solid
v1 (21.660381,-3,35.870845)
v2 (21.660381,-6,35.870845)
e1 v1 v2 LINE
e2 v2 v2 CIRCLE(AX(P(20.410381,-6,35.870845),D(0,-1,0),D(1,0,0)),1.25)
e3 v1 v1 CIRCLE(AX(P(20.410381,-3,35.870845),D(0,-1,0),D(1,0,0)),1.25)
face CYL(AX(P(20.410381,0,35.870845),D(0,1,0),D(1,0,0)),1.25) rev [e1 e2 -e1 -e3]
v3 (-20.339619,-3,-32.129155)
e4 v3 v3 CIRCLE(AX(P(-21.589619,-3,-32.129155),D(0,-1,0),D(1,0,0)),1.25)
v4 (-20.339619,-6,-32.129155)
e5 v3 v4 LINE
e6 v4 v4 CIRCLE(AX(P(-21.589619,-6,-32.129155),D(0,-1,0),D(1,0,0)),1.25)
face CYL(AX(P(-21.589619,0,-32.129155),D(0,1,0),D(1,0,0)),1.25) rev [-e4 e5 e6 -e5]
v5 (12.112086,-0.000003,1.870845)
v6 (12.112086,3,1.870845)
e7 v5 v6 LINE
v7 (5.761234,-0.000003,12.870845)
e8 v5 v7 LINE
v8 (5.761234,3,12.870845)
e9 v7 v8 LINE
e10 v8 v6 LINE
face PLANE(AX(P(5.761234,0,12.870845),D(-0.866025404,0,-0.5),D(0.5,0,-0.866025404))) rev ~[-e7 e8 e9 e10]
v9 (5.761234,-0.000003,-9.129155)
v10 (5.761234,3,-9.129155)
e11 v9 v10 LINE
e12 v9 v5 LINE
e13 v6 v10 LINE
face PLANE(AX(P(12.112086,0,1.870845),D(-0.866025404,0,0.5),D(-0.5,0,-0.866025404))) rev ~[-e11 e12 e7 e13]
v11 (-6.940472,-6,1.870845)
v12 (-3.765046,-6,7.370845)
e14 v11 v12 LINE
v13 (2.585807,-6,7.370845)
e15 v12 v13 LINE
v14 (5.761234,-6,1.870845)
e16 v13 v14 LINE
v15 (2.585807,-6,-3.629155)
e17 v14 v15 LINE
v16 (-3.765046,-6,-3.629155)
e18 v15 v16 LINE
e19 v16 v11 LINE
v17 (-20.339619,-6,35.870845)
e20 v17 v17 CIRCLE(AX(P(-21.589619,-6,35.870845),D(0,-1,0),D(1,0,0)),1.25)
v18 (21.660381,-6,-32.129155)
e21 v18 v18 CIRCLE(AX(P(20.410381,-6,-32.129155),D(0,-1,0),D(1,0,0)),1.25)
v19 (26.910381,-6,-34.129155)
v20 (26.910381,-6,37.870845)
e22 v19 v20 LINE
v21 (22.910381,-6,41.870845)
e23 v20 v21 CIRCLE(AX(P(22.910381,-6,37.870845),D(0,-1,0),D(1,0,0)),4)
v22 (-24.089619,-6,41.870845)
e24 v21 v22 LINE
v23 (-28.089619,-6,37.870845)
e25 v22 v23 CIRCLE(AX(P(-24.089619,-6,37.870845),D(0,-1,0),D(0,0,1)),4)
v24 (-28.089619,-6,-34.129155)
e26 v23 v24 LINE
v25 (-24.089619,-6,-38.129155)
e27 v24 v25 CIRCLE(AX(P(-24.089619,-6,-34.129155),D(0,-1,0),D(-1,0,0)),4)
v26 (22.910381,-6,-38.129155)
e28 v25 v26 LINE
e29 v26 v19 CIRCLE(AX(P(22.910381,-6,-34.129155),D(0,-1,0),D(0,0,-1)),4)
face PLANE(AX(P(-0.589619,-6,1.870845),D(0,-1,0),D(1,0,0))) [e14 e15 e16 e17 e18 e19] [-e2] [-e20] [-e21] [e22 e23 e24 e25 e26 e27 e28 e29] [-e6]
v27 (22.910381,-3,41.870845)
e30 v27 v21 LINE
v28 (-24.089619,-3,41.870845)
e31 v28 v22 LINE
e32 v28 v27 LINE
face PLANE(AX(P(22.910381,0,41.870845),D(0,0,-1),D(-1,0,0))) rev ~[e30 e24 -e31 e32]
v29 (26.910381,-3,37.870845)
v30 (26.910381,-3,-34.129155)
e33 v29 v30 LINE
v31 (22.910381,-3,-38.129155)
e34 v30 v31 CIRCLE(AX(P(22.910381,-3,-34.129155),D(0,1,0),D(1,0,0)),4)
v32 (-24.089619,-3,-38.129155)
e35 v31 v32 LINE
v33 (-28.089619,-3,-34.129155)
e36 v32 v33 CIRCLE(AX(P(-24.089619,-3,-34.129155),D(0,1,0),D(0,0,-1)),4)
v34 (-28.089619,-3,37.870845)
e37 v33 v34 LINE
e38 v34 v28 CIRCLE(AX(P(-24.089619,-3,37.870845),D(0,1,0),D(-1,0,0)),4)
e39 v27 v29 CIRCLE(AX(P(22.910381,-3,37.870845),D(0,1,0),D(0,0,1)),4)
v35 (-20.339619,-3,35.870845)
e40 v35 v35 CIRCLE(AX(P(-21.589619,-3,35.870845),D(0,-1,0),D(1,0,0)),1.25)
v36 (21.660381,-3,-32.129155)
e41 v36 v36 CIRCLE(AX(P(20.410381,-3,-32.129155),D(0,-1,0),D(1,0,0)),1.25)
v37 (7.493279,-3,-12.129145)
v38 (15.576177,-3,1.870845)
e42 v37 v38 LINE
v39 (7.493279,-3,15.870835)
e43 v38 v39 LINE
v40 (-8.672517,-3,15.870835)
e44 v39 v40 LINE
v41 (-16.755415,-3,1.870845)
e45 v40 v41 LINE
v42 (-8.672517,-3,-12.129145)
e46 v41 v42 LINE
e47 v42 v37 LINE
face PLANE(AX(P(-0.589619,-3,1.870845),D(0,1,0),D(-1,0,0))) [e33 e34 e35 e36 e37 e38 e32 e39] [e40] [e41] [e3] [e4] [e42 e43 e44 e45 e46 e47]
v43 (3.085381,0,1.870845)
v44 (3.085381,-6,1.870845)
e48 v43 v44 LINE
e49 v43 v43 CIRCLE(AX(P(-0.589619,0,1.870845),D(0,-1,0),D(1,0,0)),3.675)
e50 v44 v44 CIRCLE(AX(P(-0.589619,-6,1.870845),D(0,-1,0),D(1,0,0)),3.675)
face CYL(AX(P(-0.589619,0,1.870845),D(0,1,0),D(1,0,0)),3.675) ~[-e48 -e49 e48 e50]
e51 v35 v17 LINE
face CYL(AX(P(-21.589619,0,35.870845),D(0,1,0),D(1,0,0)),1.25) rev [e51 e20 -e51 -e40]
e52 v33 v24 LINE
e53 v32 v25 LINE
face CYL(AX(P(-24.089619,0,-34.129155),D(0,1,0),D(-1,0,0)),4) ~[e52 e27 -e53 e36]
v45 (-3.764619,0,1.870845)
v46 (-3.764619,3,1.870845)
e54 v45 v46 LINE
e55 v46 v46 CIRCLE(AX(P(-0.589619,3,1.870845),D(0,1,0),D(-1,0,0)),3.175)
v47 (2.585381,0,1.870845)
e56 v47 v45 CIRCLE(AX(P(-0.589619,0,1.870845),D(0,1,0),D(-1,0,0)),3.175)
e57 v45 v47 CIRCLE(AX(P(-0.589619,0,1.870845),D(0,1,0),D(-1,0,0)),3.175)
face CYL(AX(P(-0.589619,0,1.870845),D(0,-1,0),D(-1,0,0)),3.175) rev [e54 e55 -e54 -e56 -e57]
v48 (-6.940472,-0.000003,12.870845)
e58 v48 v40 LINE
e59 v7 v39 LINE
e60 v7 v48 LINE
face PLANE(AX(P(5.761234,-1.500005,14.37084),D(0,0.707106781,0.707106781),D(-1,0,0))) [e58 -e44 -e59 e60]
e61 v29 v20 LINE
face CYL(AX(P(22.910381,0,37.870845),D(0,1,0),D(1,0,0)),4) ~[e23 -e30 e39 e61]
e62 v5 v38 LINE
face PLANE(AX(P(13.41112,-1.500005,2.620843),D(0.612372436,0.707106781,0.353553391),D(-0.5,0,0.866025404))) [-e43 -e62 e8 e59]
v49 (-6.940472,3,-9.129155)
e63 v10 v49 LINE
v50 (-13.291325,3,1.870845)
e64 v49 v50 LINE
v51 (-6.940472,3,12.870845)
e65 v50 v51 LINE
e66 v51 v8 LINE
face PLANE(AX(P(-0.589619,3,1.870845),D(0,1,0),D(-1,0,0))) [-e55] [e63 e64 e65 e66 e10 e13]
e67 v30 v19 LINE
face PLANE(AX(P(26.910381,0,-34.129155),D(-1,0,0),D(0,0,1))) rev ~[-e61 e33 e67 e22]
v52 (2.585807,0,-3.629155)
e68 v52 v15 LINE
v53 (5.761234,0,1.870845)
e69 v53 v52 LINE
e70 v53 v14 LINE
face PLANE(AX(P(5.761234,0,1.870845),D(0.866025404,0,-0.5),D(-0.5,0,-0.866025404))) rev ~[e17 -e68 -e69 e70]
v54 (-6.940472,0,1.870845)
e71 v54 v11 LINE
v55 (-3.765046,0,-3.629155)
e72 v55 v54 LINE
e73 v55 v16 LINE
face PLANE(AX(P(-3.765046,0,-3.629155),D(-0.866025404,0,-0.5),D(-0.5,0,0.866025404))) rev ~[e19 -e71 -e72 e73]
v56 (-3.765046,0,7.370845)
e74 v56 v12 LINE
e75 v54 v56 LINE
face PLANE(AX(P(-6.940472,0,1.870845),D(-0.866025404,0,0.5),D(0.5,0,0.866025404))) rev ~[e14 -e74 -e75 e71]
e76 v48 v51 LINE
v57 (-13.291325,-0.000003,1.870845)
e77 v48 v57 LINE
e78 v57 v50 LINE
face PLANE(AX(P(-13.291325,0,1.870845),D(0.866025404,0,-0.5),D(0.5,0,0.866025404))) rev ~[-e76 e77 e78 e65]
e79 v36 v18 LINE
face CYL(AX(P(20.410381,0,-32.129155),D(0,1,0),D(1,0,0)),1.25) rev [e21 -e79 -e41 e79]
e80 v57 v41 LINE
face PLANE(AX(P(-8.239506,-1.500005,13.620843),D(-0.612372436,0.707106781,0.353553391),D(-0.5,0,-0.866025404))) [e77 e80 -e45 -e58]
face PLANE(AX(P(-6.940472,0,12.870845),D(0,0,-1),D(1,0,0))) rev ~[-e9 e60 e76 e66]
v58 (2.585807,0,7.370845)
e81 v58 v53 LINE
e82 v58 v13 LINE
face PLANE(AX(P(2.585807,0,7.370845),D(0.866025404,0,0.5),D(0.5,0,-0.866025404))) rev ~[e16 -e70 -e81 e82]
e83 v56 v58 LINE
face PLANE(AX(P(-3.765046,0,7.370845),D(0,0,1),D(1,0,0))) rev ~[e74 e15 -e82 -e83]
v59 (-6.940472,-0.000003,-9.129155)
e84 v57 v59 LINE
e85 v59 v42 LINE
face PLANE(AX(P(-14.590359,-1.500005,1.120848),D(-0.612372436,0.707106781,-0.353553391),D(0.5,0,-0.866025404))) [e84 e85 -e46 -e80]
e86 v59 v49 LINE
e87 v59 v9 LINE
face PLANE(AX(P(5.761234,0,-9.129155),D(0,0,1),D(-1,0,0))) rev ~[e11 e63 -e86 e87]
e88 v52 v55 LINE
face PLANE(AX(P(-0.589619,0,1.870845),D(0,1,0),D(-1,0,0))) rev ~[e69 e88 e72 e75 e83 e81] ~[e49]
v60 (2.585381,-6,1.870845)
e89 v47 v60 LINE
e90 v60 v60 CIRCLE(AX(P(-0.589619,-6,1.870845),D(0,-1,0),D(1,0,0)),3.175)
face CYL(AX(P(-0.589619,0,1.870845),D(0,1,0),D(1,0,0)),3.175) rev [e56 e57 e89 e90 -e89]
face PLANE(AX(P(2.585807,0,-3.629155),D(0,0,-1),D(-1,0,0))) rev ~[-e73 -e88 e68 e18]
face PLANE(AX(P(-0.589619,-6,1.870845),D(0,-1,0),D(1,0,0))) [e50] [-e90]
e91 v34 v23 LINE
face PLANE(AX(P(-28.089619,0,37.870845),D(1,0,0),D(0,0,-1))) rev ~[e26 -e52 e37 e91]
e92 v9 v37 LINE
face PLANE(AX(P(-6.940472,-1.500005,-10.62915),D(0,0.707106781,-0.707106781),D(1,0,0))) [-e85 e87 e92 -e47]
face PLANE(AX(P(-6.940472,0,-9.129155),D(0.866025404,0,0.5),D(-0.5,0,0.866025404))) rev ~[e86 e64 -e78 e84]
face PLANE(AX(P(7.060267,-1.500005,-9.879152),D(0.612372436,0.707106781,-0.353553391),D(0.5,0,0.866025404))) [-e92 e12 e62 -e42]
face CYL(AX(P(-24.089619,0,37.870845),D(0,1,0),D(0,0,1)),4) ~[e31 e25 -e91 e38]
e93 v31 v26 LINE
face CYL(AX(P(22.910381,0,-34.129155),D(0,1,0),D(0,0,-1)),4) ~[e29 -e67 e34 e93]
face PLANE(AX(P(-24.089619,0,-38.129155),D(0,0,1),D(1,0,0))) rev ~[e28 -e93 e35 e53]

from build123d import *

# Parameters (mm, degrees)
F0_R     = 1.25
F1_DEPTH = 6
F2_R     = 1.25
F3_DEPTH = 3
F4_SIZE  = 2.99999
F5_R     = 3.175
F6_DEPTH = 3
F7_R     = 3.675
F7_R_2   = 3.175
F8_DEPTH = 6


# Not quite as in the source:
# - a fillet or chamfer is up to 0.001 mm smaller than in the source, because OpenCascade refuses the exact size


with BuildPart() as f1:
    # F0 (on Front) → F1 (new body)
    with BuildSketch(Plane.XZ):
        with BuildLine():
            Line((22.9103805721, 41.8708454072), (-24.0896194279, 41.8708454072))
            ThreePointArc((-24.0896194279, 41.8708454072), (-26.9180465527, 40.699272532), (-28.0896194279, 37.8708454072))
            Line((-28.0896194279, 37.8708454072), (-28.0896194279, -34.1291545928))
            ThreePointArc((-28.0896194279, -34.1291545928), (-26.9180465527, -36.9575817175), (-24.0896194279, -38.1291545928))
            Line((-24.0896194279, -38.1291545928), (22.9103805721, -38.1291545928))
            ThreePointArc((22.9103805721, -38.1291545928), (25.7388076968, -36.9575817175), (26.9103805721, -34.1291545928))
            Line((26.9103805721, -34.1291545928), (26.9103805721, 37.8708454072))
            ThreePointArc((26.9103805721, 37.8708454072), (25.7388076968, 40.699272532), (22.9103805721, 41.8708454072))
        make_face()
        with Locations((-21.5896194279, -32.1291545928)):
            Circle(F0_R, mode=Mode.SUBTRACT)
        with Locations((20.4103805721, -32.1291545928)):
            Circle(F0_R, mode=Mode.SUBTRACT)
        Polygon((5.7612335332, 1.8708454072), (2.5858070526, -3.6291545928), (-3.7650459085, -3.6291545928), (-6.940472389, 1.8708454072), (-3.7650459085, 7.3708454072), (2.5858070526, 7.3708454072), align=None, mode=Mode.SUBTRACT)
        with Locations((-21.5896194279, 35.8708454072)):
            Circle(F0_R, mode=Mode.SUBTRACT)
        with Locations((20.4103805721, 35.8708454072)):
            Circle(F0_R, mode=Mode.SUBTRACT)
    extrude(amount=F1_DEPTH)

    # F2 (on face) → F3 (cut)
    with BuildSketch(Plane(origin=(0, 0, 0), x_dir=(-1, 0, 0), z_dir=(0, 1, 0))):
        with BuildLine():
            ThreePointArc((28.0896194279, 37.8708454072), (26.9180465527, 40.699272532), (24.0896194279, 41.8708454072))
            Line((24.0896194279, 41.8708454072), (-22.9103805721, 41.8708454072))
            ThreePointArc((-22.9103805721, 41.8708454072), (-25.7388076968, 40.699272532), (-26.9103805721, 37.8708454072))
            Line((-26.9103805721, 37.8708454072), (-26.9103805721, -34.1291545928))
            ThreePointArc((-26.9103805721, -34.1291545928), (-25.7388076968, -36.9575817175), (-22.9103805721, -38.1291545928))
            Line((-22.9103805721, -38.1291545928), (24.0896194279, -38.1291545928))
            ThreePointArc((24.0896194279, -38.1291545928), (26.9180465527, -36.9575817175), (28.0896194279, -34.1291545928))
            Line((28.0896194279, -34.1291545928), (28.0896194279, 37.8708454072))
        make_face()
        with Locations((-20.4103805721, -32.1291545928)):
            Circle(F2_R, mode=Mode.SUBTRACT)
        with Locations((21.5896194279, -32.1291545928)):
            Circle(F2_R, mode=Mode.SUBTRACT)
        Polygon((13.2913253501, 1.8708454072), (6.940472389, -9.1291545928), (-5.7612335332, -9.1291545928), (-12.1120864943, 1.8708454072), (-5.7612335332, 12.8708454072), (6.940472389, 12.8708454072), align=None, mode=Mode.SUBTRACT)
        with Locations((-20.4103805721, 35.8708454072)):
            Circle(F2_R, mode=Mode.SUBTRACT)
        with Locations((21.5896194279, 35.8708454072)):
            Circle(F2_R, mode=Mode.SUBTRACT)
    extrude(amount=-F3_DEPTH, mode=Mode.SUBTRACT)

    # F4 (size 3 in the source; OpenCascade refuses exactly that, so slightly less here)
    f4_edges = [f1.edges().sort_by_distance(p)[0] for p in [
        (8.93666, -3, 7.370845),
        (8.93666, -3, -3.629155),
        (-0.589619, -3, -9.129155),
        (-10.115899, -3, -3.629155),
        (-10.115899, -3, 7.370845),
        (-0.589619, -3, 12.870845),
    ]]
    chamfer(f4_edges, length=F4_SIZE)

    # F5 (on face) → F6 (join)
    with BuildSketch(Plane(origin=(0, 0, 0), x_dir=(-1, 0, 0), z_dir=(0, 1, 0))):
        Polygon((6.940472389, -9.1291545928), (13.2913253501, 1.8708454072), (6.940472389, 12.8708454072), (-5.7612335332, 12.8708454072), (-12.1120864943, 1.8708454072), (-5.7612335332, -9.1291545928), align=None)
        Polygon((3.7650459085, -3.6291545928), (-2.5858070526, -3.6291545928), (-5.7612335332, 1.8708454072), (-2.5858070526, 7.3708454072), (3.7650459085, 7.3708454072), (6.940472389, 1.8708454072), align=None, mode=Mode.SUBTRACT)
        Polygon((-5.7612335332, 1.8708454072), (-2.5858070526, -3.6291545928), (3.7650459085, -3.6291545928), (6.940472389, 1.8708454072), (3.7650459085, 7.3708454072), (-2.5858070526, 7.3708454072), align=None)
        with Locations((0.5896194279, 1.8708454072)):
            Circle(F5_R, mode=Mode.SUBTRACT)
    extrude(amount=F6_DEPTH)

    # F7 (on face) → F8 (join, through all)
    with BuildSketch(Plane.XZ):
        with Locations((-0.5896194279, 1.8708454072)):
            Circle(F7_R)
        with Locations((-0.5896194279, 1.8708454072)):
            Circle(F7_R_2, mode=Mode.SUBTRACT)
    extrude(amount=F8_DEPTH)


solid = f1.part
